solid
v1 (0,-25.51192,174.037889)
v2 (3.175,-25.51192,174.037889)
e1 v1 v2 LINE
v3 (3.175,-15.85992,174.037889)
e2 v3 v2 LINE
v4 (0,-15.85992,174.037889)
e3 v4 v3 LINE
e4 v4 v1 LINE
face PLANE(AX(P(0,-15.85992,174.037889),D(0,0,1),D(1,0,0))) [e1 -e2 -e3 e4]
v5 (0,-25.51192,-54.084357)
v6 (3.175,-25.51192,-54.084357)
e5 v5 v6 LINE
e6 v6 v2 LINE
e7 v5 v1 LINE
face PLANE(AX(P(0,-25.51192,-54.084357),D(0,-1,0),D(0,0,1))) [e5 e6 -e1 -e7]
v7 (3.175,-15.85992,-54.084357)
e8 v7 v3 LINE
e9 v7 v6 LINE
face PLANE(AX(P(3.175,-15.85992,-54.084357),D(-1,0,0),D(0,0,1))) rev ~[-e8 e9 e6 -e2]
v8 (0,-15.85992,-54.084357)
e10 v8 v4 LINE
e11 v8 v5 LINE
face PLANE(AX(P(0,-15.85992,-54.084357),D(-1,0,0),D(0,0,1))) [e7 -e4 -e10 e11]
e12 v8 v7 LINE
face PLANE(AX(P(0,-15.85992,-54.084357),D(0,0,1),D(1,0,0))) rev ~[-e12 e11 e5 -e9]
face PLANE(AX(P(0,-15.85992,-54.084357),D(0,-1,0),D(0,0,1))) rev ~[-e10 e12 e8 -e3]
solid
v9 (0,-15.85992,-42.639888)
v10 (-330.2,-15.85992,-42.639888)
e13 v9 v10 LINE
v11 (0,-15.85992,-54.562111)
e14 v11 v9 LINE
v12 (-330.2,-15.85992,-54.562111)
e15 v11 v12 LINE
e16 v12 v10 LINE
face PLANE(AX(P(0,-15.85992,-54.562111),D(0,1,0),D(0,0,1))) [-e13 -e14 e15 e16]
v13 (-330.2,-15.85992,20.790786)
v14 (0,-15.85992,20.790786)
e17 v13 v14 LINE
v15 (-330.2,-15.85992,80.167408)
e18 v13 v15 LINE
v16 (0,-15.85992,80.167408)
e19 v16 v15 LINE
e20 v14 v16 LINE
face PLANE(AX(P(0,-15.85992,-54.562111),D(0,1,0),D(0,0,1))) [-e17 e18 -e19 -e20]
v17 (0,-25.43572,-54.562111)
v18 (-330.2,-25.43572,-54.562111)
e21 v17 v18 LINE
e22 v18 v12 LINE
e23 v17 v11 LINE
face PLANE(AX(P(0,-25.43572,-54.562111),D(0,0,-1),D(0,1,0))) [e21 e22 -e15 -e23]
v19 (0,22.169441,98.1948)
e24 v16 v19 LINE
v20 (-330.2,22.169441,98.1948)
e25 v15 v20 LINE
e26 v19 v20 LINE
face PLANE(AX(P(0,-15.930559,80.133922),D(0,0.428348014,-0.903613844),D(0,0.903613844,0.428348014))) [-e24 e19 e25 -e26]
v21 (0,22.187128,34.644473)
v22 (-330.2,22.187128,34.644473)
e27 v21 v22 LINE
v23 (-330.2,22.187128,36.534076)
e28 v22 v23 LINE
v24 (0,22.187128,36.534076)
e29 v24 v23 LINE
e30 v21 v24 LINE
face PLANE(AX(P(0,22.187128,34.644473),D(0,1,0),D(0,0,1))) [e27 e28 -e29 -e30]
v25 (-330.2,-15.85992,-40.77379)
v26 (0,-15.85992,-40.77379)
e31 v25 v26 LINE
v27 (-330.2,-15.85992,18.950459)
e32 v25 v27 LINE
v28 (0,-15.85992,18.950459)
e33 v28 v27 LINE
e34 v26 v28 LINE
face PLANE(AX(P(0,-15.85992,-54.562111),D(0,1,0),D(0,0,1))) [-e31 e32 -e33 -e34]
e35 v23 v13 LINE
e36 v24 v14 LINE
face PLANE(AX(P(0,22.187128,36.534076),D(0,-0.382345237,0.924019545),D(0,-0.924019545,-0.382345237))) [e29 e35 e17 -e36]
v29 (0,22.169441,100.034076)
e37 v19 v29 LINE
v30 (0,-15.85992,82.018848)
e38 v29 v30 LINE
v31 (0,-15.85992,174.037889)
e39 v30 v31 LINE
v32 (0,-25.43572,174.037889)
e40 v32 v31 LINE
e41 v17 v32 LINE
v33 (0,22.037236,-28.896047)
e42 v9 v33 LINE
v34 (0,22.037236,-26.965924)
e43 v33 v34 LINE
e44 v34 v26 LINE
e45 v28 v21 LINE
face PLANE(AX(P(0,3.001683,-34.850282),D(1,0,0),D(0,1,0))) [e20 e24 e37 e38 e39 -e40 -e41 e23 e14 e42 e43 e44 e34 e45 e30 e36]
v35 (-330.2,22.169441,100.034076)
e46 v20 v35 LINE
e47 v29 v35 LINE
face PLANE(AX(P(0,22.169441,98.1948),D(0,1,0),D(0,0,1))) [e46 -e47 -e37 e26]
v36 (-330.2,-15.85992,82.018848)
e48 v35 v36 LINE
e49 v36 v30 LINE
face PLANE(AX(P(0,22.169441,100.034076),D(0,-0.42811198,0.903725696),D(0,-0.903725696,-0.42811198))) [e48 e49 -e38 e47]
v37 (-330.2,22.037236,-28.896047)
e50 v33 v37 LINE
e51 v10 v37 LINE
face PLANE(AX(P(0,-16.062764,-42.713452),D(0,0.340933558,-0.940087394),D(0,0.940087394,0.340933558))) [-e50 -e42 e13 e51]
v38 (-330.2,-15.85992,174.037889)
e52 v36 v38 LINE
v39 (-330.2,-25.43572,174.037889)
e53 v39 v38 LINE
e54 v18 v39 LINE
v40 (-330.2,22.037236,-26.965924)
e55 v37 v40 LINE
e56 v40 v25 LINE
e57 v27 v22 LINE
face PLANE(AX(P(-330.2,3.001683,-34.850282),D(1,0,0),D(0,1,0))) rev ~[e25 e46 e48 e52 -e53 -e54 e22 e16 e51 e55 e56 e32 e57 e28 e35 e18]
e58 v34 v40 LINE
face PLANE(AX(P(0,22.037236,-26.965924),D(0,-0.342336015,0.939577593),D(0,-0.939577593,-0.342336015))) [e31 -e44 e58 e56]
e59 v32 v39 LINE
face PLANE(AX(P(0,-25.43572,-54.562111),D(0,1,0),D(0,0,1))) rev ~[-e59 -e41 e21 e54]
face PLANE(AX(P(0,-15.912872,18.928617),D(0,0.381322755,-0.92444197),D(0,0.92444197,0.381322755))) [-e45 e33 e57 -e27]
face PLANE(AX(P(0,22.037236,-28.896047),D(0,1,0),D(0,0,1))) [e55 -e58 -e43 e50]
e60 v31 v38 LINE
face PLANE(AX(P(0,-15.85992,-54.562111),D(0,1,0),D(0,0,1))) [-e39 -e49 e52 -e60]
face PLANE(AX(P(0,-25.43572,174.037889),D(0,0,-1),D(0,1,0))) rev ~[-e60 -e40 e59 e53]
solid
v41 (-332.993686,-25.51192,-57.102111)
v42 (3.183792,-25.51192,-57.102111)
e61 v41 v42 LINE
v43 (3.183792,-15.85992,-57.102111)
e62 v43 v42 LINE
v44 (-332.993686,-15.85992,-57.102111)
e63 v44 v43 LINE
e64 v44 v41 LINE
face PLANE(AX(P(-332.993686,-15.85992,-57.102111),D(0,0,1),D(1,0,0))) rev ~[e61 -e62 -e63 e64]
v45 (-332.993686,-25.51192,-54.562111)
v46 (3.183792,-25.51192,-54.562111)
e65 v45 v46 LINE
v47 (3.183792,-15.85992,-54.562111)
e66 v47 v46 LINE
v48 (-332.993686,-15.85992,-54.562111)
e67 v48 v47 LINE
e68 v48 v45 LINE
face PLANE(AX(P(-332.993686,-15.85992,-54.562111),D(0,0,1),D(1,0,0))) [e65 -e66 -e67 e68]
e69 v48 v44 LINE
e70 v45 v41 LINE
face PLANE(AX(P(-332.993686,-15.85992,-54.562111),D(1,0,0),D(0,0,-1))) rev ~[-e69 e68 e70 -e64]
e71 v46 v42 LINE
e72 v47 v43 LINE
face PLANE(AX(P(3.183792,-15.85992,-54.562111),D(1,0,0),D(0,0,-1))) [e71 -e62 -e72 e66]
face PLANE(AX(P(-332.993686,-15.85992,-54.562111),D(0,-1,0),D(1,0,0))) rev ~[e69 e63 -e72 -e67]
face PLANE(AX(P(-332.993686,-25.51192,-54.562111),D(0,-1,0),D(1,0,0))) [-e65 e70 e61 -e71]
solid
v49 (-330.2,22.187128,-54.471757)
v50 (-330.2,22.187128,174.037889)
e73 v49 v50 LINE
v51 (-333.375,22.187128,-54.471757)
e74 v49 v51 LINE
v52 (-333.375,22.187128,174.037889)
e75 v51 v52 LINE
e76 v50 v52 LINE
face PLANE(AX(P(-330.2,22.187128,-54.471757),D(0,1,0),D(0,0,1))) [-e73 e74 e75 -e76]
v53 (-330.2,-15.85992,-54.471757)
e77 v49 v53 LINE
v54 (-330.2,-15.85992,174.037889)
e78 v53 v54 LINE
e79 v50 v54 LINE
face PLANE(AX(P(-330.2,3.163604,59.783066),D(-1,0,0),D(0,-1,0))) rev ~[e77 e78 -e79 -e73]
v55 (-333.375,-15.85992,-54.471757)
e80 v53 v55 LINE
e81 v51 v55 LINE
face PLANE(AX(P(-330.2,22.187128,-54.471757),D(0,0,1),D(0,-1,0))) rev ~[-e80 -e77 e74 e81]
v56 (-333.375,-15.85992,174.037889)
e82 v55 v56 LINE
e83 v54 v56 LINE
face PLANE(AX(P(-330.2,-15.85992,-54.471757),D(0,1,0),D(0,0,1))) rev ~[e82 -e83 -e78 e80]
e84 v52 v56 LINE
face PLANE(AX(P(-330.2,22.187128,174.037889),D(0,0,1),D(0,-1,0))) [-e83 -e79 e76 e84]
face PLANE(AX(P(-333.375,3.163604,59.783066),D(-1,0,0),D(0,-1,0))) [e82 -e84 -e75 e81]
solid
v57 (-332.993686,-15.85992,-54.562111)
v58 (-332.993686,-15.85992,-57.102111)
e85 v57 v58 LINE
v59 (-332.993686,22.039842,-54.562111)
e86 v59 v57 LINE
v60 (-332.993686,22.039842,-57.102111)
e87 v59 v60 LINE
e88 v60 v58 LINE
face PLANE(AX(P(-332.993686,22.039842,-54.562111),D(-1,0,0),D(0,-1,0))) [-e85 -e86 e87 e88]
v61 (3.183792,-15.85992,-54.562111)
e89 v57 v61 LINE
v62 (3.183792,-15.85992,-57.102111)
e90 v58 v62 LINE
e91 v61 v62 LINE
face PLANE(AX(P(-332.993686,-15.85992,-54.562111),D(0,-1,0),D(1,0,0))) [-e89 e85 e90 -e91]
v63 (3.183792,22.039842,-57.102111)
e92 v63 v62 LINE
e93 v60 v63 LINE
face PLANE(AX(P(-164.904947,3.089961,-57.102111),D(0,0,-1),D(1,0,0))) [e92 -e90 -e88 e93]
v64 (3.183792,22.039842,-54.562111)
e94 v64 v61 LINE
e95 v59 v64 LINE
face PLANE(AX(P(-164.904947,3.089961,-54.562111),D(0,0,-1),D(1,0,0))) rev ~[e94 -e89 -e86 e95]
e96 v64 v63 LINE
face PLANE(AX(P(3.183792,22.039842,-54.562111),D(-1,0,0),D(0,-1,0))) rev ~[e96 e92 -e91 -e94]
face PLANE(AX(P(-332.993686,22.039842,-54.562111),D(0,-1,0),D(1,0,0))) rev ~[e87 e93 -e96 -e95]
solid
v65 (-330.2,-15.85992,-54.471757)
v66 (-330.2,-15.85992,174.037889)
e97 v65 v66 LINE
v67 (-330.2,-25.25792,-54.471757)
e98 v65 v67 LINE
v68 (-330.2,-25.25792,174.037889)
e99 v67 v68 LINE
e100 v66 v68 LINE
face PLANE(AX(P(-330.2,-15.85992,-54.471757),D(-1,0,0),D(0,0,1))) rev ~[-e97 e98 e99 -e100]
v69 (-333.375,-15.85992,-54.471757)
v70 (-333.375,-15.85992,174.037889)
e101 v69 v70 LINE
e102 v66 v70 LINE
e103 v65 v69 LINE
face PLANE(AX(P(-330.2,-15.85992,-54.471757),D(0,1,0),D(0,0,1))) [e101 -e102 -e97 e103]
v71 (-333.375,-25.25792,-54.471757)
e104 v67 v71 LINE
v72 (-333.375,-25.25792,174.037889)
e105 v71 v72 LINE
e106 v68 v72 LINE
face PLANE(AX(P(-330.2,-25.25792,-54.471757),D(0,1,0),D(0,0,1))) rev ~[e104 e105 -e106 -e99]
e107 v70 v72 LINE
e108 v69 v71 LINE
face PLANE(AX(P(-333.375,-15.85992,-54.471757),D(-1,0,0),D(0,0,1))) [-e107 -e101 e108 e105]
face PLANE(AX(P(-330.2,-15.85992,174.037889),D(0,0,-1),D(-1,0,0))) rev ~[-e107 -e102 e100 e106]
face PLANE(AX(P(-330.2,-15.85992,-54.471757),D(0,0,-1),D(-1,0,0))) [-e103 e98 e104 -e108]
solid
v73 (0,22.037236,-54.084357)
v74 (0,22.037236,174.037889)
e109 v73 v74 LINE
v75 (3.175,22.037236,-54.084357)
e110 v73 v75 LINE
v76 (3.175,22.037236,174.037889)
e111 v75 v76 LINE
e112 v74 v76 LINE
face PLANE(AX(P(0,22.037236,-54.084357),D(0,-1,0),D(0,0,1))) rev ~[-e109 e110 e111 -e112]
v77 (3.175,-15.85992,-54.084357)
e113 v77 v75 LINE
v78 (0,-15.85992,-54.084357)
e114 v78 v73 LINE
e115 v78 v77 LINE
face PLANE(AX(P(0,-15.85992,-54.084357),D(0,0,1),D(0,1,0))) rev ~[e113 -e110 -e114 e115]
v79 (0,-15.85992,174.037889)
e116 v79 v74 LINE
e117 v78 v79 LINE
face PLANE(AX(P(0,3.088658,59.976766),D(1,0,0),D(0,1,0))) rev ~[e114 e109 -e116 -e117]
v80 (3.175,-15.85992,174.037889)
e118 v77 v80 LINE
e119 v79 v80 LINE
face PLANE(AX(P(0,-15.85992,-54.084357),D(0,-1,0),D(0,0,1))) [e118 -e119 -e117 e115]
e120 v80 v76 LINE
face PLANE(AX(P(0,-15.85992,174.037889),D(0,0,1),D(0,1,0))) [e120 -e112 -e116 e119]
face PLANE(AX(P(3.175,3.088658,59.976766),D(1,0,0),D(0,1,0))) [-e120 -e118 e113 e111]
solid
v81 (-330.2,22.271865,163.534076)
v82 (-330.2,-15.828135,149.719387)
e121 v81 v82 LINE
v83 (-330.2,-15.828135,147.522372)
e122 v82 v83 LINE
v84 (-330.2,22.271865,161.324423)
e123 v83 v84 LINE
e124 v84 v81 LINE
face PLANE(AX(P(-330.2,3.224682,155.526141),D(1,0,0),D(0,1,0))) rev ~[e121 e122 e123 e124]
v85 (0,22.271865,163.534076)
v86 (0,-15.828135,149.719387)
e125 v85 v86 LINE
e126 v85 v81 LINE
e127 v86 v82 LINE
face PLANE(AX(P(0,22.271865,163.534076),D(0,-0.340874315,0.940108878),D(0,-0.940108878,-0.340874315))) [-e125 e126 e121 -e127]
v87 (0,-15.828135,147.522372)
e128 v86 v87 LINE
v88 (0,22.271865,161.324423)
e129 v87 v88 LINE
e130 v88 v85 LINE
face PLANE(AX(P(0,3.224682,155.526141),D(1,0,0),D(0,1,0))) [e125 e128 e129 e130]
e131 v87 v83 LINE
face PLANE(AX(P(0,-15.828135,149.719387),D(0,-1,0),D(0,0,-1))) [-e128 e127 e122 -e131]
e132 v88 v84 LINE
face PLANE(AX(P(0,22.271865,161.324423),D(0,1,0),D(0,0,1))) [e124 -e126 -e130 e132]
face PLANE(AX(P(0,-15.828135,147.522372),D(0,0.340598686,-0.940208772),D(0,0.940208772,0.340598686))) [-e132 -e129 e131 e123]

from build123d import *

# Parameters (mm, degrees)
F0_W      = 9.5758
F0_H      = 228.6
F1_DEPTH  = 330.2
F3_DEPTH  = 330.2
F4_W      = 38.0470480231
F4_H      = 228.509646448
F5_DEPTH  = 3.175
F6_W      = 37.8971553801
F6_H      = 228.1222460593
F7_DEPTH  = 3.175
F8_W      = 336.1774778459
F8_H      = 37.8997616915
F9_DEPTH  = 2.54
F10_DEPTH = 9.398
F11_DEPTH = 9.652
F12_DEPTH = 9.652


# Not quite as in the source:
# - a feature names something its author has since deleted; it is built from what else it names


with BuildPart() as f1:
    # F0 (on Right) → F1 (new body)
    with BuildSketch(Plane.YZ):
        with Locations((-20.647819831, 59.7378891851)):
            Rectangle(F0_W, F0_H)
    extrude(amount=-F1_DEPTH)

    # F2 (on Right) → F3 (join)
    with BuildSketch(Plane.YZ):
        Polygon((22.0372355491, -26.9659241096), (-16.0627644509, -40.8476963639), (-16.0627644509, -42.7134521306), (22.0372355491, -28.8960468024), align=None)
        Polygon((22.1871281922, 36.5340758904), (-15.9128718078, 20.7688752562), (-15.9128718078, 18.928617239), (22.1871281922, 34.6444733441), align=None)
        Polygon((22.1694405138, 100.0340758904), (-15.9305594862, 81.9853842258), (-15.9305594862, 80.1339223981), (22.1694405138, 98.1948003173), align=None)
    extrude(amount=-F3_DEPTH)


with BuildPart() as f3:
    # F2 (on Right) → F3, piece 2 (new body)
    with BuildSketch(Plane.YZ):
        Polygon((22.2718652983, 163.5340758904), (-15.8281347017, 149.7193872929), (-15.8281347017, 147.5223718815), (22.2718652983, 161.3244234257), align=None)
    extrude(amount=-F3_DEPTH)


with BuildPart() as f5:
    # F4 (on face) → F5 (new body)
    with BuildSketch(Plane(origin=(-330.2, 0, 0), x_dir=(0, -1, 0), z_dir=(-1, 0, 0))):
        with Locations((-3.1636041806, 59.7830659611)):
            Rectangle(F4_W, F4_H)
    extrude(amount=F5_DEPTH)


with BuildPart() as f7:
    # F6 (on face) → F7 (new body)
    with BuildSketch(Plane.YZ):
        with Locations((3.0886578591, 59.9767661554)):
            Rectangle(F6_W, F6_H)
    extrude(amount=F7_DEPTH)


with BuildPart() as f9:
    # F8 (on face) → F9 (new body)
    with BuildSketch(Plane(origin=(0, 0, -54.5621108149), x_dir=(1, 0, 0), z_dir=(0, 0, -1))):
        with Locations((-164.9049472762, -3.0899610148)):
            Rectangle(F8_W, F8_H)
    extrude(amount=F9_DEPTH)


with BuildPart() as f10:
    # F10 (new): a face of the model
    f10_faces = [f5.part.faces().sort_by_distance(p)[0] for p in [
        (-331.7875, -15.859919831, 59.7830659611),
    ]]
    extrude(f10_faces, amount=F10_DEPTH)


with BuildPart() as f11:
    # F11 (new): a face of the model
    f11_faces = [f9.part.faces().sort_by_distance(p)[0] for p in [
        (-164.9049472762, -15.859919831, -55.8321108149),
    ]]
    extrude(f11_faces, amount=F11_DEPTH)


with BuildPart() as f12:
    # F12 (new): a face of the model
    f12_faces = [f7.part.faces().sort_by_distance(p)[0] for p in [
        (1.5875, -15.859919831, 59.9767661554),
    ]]
    extrude(f12_faces, amount=F12_DEPTH)


solid = Compound([f1.part, f3.part, f5.part, f7.part, f9.part, f10.part, f11.part, f12.part])
